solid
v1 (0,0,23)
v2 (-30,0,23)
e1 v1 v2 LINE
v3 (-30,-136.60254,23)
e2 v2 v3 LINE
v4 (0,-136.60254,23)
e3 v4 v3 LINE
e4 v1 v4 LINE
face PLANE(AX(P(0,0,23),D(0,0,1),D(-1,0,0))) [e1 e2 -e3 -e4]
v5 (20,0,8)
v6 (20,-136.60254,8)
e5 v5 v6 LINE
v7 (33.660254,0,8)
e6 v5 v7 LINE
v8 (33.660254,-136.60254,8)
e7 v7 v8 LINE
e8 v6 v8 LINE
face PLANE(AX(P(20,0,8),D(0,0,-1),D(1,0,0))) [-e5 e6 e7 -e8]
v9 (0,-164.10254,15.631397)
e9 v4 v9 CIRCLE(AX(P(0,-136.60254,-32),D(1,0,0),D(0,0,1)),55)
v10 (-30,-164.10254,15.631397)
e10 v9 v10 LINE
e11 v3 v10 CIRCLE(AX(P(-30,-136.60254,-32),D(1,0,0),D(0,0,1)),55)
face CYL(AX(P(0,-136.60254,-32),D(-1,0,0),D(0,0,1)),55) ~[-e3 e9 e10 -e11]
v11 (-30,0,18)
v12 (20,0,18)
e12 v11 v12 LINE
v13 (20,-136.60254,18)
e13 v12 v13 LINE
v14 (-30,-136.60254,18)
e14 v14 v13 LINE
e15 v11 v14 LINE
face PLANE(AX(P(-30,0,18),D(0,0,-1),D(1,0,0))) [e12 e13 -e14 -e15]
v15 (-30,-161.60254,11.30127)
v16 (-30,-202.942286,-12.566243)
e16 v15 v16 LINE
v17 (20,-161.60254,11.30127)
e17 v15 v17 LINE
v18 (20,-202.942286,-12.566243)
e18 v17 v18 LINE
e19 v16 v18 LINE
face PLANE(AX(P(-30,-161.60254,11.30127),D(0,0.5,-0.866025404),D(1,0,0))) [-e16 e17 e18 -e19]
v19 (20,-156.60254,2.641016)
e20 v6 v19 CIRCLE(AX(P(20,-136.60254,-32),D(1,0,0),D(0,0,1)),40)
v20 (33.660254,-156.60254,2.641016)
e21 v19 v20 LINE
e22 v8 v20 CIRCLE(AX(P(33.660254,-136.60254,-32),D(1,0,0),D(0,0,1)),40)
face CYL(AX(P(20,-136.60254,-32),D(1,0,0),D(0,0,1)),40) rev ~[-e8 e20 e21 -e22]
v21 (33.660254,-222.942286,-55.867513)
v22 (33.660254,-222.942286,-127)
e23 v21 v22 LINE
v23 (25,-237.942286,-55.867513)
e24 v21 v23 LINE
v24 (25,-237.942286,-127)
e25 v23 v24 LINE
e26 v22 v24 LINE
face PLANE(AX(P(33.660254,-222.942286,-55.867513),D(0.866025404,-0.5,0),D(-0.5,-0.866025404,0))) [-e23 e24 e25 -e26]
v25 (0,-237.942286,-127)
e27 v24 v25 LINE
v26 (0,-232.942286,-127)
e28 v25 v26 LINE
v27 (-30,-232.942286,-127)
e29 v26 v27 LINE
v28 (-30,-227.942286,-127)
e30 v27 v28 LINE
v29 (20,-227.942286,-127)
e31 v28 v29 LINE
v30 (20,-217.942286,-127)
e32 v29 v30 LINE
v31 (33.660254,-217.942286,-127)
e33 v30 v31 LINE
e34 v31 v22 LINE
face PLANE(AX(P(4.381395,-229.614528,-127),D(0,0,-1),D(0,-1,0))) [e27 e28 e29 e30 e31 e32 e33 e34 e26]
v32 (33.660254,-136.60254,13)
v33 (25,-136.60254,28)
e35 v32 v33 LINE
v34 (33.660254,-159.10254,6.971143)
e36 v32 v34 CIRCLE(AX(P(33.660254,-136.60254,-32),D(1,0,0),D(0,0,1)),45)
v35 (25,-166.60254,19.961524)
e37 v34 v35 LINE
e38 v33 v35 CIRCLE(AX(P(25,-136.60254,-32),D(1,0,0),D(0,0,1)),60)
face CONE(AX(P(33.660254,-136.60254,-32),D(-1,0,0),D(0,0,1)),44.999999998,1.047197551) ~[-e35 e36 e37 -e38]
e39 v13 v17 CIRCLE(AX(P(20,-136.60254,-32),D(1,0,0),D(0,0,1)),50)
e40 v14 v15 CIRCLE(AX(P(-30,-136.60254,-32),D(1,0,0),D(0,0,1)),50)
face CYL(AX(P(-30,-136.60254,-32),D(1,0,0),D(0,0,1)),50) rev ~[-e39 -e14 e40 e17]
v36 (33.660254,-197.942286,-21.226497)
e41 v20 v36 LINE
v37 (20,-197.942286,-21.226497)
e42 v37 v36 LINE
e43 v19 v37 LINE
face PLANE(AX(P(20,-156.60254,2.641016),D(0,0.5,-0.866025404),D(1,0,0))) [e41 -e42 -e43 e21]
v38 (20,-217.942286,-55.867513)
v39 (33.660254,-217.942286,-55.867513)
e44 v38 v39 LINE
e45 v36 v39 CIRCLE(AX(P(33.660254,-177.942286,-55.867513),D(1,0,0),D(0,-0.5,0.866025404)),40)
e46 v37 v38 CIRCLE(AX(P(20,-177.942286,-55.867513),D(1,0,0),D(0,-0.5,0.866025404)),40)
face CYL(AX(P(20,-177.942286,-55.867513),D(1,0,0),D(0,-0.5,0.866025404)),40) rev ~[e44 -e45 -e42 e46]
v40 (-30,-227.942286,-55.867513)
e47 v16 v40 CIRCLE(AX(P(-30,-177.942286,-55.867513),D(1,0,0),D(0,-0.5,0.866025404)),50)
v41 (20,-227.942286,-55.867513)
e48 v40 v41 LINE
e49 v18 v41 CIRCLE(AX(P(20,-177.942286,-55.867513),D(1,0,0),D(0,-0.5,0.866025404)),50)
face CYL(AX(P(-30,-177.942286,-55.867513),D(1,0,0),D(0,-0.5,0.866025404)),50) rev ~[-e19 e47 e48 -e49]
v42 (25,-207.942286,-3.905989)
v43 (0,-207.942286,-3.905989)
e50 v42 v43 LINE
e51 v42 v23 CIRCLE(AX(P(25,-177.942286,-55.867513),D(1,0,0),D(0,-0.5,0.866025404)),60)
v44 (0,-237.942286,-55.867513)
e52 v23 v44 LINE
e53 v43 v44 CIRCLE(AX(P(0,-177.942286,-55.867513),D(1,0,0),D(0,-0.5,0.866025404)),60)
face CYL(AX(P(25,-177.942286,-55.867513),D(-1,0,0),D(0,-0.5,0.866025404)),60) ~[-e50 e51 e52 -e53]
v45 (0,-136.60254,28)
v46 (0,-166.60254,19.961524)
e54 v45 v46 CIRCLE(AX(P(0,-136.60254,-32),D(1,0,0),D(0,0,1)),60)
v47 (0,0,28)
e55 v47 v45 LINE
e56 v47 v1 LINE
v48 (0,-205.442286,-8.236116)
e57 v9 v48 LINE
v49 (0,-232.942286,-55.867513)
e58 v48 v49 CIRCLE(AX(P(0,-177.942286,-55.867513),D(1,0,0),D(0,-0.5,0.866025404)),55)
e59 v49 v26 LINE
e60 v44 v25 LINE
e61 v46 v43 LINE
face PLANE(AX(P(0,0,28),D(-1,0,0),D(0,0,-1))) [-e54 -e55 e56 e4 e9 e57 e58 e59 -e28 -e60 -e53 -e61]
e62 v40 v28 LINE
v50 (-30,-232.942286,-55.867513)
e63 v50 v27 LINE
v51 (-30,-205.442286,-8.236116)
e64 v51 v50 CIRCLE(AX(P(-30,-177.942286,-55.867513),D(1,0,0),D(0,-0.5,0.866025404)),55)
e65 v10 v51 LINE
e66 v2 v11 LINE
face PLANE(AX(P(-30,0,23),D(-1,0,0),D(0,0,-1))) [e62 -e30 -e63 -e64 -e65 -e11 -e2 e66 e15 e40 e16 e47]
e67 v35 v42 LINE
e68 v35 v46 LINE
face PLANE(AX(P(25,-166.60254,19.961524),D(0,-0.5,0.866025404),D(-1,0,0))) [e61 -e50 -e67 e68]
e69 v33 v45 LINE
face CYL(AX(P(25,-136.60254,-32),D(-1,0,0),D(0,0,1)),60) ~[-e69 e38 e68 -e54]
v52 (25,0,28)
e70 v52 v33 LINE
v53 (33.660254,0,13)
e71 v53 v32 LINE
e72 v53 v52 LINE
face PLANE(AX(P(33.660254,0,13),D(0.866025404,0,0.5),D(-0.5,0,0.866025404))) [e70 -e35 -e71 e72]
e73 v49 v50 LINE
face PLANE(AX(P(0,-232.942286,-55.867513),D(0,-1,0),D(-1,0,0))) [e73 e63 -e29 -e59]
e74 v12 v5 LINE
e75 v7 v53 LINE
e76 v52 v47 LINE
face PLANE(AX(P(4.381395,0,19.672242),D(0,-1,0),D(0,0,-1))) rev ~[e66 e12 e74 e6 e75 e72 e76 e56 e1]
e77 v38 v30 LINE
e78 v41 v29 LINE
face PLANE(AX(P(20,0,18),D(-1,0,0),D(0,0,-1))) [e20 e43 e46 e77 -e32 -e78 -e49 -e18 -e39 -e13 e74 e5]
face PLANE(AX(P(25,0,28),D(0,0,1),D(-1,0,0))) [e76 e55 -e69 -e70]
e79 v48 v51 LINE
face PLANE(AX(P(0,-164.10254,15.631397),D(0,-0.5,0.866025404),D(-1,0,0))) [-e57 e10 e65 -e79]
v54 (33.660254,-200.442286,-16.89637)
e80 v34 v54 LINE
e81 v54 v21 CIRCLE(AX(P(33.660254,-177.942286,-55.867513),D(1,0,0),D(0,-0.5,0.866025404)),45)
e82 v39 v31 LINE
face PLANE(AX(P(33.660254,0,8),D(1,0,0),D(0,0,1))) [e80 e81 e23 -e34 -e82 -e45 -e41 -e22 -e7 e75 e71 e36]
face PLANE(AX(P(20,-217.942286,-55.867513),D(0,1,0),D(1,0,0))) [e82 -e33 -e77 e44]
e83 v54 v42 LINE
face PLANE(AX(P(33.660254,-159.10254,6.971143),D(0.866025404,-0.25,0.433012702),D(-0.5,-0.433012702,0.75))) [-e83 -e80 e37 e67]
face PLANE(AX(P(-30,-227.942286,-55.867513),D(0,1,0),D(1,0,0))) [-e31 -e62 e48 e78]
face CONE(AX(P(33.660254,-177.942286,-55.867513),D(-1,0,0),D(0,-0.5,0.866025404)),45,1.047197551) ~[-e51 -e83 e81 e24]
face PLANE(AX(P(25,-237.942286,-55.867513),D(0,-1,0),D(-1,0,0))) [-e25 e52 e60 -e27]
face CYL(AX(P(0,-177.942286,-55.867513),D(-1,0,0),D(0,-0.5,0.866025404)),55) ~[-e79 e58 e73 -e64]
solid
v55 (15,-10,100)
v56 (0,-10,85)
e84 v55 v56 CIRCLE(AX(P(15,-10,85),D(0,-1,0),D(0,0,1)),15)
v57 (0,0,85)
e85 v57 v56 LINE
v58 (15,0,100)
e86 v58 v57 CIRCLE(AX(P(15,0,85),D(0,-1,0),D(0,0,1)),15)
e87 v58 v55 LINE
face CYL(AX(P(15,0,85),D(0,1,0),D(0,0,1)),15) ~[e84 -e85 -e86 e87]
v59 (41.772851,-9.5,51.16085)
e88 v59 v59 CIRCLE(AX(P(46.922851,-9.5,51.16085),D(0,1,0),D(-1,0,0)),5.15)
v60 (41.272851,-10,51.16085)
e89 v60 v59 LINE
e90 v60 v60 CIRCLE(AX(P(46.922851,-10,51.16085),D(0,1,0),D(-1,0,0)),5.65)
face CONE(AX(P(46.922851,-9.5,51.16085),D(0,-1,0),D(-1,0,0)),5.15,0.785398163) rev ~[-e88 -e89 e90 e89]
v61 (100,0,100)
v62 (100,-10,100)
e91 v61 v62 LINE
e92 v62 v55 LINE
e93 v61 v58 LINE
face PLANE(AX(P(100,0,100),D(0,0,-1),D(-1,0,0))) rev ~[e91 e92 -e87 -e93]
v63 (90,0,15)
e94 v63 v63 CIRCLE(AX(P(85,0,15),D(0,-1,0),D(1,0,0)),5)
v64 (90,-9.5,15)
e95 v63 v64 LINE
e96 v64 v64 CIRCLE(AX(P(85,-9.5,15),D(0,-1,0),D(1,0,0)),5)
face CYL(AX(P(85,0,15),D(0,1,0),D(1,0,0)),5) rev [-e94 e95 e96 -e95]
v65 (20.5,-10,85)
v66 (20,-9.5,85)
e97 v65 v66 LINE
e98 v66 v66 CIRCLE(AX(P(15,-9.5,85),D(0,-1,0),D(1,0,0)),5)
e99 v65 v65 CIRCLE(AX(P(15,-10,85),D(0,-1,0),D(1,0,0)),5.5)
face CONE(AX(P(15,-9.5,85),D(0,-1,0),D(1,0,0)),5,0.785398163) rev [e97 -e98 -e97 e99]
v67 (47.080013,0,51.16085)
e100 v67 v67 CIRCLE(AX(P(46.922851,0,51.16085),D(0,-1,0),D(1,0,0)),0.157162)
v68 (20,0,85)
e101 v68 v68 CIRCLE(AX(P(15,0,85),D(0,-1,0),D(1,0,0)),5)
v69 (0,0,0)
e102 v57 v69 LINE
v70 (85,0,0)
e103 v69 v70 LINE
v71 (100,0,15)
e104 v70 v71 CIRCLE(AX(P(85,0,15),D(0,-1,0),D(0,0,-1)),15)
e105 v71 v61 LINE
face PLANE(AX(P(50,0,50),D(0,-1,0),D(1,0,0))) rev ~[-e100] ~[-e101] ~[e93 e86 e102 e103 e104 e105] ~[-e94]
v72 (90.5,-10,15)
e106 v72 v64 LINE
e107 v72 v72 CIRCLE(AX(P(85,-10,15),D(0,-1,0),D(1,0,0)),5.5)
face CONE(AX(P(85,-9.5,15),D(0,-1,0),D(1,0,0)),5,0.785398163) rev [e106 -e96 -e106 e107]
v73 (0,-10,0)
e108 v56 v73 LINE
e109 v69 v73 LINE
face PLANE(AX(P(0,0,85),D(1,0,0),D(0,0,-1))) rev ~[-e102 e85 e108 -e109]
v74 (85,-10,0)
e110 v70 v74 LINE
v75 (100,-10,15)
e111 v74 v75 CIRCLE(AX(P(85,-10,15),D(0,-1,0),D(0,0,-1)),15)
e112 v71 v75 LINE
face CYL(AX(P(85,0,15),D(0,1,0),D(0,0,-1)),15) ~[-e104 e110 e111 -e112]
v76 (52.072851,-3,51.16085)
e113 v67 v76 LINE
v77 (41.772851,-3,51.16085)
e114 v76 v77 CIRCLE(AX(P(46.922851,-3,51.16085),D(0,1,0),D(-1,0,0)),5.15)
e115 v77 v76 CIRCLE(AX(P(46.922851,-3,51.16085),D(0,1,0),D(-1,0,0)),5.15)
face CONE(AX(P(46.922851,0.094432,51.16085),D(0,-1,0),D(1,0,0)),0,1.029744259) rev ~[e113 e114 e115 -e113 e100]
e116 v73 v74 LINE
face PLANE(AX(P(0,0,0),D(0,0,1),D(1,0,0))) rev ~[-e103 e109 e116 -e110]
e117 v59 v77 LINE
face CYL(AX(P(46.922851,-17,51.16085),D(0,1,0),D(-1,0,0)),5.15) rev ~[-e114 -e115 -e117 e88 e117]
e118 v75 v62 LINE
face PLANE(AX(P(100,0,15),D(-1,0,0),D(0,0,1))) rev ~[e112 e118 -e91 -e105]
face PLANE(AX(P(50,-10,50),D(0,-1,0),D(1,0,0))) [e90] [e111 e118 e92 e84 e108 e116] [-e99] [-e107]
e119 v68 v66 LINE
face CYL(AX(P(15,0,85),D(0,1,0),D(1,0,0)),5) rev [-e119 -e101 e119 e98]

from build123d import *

# Parameters (mm, degrees)
F0_R     = 5
F1_DEPTH = 10
F3_D     = 10.3
F3_DEPTH = 7
F3_TIP   = 3.094432188
F4_SIZE  = 0.5


with BuildPart() as f1:
    # F0 (on Front) → F1 (new body)
    with BuildSketch(Plane.XZ):
        with BuildLine():
            Line((0, 85), (0, 0))
            Line((0, 0), (85, 0))
            ThreePointArc((85, 0), (95.6066017178, 4.3933982822), (100, 15))
            Line((100, 15), (100, 100))
            Line((100, 100), (15, 100))
            ThreePointArc((15, 100), (4.3933982822, 95.6066017178), (0, 85))
        make_face()
        with Locations((85, 15)):
            Circle(F0_R, mode=Mode.SUBTRACT)
        with Locations((15, 85)):
            Circle(F0_R, mode=Mode.SUBTRACT)
    extrude(amount=F1_DEPTH)

    # F3
    with Locations(Plane.XZ.offset(10)):
        with Locations((46.9228513539, 51.1608496308)):
            Hole(F3_D / 2, depth=F3_DEPTH)
            with Locations((0, 0, -(F3_DEPTH + F3_TIP / 2))):  # 118° drill point
                Cone(0, F3_D / 2, F3_TIP, mode=Mode.SUBTRACT)

    # F4
    f4_edges = [f1.edges().sort_by_distance(p)[0] for p in [
        (10, -10, 85),
        (80, -10, 15),
        (41.772851, -10, 51.16085),
    ]]
    chamfer(f4_edges, length=F4_SIZE)


with BuildPart() as f7:
    # F7: sweep along a path in F6
    with BuildLine(Plane.YZ) as f7_path:
        Line((0, 18), (-136.6025403784, 18))
        ThreePointArc((-136.6025403784, 18), (-149.5434926336, 16.2962913145), (-161.6025403784, 11.3012701892))
        Line((-161.6025403784, 11.3012701892), (-202.9422863406, -12.5662432703))
        ThreePointArc((-202.9422863406, -12.5662432703), (-221.2435565298, -30.8675134595), (-227.9422863406, -55.8675134595))
        Line((-227.9422863406, -55.8675134595), (-227.9422863406, -127))
    # F5 (on Front) → F7 (sweep)
    with BuildSketch(Plane.XZ):
        Polygon((-30, 23), (-30, 18), (20, 18), (20, 8), (33.6602540378, 8), (33.6602540378, 13), (25, 28), (0, 28), (0, 23), align=None)
    sweep(path=f7_path.line)


solid = Compound([f1.part, f7.part])
